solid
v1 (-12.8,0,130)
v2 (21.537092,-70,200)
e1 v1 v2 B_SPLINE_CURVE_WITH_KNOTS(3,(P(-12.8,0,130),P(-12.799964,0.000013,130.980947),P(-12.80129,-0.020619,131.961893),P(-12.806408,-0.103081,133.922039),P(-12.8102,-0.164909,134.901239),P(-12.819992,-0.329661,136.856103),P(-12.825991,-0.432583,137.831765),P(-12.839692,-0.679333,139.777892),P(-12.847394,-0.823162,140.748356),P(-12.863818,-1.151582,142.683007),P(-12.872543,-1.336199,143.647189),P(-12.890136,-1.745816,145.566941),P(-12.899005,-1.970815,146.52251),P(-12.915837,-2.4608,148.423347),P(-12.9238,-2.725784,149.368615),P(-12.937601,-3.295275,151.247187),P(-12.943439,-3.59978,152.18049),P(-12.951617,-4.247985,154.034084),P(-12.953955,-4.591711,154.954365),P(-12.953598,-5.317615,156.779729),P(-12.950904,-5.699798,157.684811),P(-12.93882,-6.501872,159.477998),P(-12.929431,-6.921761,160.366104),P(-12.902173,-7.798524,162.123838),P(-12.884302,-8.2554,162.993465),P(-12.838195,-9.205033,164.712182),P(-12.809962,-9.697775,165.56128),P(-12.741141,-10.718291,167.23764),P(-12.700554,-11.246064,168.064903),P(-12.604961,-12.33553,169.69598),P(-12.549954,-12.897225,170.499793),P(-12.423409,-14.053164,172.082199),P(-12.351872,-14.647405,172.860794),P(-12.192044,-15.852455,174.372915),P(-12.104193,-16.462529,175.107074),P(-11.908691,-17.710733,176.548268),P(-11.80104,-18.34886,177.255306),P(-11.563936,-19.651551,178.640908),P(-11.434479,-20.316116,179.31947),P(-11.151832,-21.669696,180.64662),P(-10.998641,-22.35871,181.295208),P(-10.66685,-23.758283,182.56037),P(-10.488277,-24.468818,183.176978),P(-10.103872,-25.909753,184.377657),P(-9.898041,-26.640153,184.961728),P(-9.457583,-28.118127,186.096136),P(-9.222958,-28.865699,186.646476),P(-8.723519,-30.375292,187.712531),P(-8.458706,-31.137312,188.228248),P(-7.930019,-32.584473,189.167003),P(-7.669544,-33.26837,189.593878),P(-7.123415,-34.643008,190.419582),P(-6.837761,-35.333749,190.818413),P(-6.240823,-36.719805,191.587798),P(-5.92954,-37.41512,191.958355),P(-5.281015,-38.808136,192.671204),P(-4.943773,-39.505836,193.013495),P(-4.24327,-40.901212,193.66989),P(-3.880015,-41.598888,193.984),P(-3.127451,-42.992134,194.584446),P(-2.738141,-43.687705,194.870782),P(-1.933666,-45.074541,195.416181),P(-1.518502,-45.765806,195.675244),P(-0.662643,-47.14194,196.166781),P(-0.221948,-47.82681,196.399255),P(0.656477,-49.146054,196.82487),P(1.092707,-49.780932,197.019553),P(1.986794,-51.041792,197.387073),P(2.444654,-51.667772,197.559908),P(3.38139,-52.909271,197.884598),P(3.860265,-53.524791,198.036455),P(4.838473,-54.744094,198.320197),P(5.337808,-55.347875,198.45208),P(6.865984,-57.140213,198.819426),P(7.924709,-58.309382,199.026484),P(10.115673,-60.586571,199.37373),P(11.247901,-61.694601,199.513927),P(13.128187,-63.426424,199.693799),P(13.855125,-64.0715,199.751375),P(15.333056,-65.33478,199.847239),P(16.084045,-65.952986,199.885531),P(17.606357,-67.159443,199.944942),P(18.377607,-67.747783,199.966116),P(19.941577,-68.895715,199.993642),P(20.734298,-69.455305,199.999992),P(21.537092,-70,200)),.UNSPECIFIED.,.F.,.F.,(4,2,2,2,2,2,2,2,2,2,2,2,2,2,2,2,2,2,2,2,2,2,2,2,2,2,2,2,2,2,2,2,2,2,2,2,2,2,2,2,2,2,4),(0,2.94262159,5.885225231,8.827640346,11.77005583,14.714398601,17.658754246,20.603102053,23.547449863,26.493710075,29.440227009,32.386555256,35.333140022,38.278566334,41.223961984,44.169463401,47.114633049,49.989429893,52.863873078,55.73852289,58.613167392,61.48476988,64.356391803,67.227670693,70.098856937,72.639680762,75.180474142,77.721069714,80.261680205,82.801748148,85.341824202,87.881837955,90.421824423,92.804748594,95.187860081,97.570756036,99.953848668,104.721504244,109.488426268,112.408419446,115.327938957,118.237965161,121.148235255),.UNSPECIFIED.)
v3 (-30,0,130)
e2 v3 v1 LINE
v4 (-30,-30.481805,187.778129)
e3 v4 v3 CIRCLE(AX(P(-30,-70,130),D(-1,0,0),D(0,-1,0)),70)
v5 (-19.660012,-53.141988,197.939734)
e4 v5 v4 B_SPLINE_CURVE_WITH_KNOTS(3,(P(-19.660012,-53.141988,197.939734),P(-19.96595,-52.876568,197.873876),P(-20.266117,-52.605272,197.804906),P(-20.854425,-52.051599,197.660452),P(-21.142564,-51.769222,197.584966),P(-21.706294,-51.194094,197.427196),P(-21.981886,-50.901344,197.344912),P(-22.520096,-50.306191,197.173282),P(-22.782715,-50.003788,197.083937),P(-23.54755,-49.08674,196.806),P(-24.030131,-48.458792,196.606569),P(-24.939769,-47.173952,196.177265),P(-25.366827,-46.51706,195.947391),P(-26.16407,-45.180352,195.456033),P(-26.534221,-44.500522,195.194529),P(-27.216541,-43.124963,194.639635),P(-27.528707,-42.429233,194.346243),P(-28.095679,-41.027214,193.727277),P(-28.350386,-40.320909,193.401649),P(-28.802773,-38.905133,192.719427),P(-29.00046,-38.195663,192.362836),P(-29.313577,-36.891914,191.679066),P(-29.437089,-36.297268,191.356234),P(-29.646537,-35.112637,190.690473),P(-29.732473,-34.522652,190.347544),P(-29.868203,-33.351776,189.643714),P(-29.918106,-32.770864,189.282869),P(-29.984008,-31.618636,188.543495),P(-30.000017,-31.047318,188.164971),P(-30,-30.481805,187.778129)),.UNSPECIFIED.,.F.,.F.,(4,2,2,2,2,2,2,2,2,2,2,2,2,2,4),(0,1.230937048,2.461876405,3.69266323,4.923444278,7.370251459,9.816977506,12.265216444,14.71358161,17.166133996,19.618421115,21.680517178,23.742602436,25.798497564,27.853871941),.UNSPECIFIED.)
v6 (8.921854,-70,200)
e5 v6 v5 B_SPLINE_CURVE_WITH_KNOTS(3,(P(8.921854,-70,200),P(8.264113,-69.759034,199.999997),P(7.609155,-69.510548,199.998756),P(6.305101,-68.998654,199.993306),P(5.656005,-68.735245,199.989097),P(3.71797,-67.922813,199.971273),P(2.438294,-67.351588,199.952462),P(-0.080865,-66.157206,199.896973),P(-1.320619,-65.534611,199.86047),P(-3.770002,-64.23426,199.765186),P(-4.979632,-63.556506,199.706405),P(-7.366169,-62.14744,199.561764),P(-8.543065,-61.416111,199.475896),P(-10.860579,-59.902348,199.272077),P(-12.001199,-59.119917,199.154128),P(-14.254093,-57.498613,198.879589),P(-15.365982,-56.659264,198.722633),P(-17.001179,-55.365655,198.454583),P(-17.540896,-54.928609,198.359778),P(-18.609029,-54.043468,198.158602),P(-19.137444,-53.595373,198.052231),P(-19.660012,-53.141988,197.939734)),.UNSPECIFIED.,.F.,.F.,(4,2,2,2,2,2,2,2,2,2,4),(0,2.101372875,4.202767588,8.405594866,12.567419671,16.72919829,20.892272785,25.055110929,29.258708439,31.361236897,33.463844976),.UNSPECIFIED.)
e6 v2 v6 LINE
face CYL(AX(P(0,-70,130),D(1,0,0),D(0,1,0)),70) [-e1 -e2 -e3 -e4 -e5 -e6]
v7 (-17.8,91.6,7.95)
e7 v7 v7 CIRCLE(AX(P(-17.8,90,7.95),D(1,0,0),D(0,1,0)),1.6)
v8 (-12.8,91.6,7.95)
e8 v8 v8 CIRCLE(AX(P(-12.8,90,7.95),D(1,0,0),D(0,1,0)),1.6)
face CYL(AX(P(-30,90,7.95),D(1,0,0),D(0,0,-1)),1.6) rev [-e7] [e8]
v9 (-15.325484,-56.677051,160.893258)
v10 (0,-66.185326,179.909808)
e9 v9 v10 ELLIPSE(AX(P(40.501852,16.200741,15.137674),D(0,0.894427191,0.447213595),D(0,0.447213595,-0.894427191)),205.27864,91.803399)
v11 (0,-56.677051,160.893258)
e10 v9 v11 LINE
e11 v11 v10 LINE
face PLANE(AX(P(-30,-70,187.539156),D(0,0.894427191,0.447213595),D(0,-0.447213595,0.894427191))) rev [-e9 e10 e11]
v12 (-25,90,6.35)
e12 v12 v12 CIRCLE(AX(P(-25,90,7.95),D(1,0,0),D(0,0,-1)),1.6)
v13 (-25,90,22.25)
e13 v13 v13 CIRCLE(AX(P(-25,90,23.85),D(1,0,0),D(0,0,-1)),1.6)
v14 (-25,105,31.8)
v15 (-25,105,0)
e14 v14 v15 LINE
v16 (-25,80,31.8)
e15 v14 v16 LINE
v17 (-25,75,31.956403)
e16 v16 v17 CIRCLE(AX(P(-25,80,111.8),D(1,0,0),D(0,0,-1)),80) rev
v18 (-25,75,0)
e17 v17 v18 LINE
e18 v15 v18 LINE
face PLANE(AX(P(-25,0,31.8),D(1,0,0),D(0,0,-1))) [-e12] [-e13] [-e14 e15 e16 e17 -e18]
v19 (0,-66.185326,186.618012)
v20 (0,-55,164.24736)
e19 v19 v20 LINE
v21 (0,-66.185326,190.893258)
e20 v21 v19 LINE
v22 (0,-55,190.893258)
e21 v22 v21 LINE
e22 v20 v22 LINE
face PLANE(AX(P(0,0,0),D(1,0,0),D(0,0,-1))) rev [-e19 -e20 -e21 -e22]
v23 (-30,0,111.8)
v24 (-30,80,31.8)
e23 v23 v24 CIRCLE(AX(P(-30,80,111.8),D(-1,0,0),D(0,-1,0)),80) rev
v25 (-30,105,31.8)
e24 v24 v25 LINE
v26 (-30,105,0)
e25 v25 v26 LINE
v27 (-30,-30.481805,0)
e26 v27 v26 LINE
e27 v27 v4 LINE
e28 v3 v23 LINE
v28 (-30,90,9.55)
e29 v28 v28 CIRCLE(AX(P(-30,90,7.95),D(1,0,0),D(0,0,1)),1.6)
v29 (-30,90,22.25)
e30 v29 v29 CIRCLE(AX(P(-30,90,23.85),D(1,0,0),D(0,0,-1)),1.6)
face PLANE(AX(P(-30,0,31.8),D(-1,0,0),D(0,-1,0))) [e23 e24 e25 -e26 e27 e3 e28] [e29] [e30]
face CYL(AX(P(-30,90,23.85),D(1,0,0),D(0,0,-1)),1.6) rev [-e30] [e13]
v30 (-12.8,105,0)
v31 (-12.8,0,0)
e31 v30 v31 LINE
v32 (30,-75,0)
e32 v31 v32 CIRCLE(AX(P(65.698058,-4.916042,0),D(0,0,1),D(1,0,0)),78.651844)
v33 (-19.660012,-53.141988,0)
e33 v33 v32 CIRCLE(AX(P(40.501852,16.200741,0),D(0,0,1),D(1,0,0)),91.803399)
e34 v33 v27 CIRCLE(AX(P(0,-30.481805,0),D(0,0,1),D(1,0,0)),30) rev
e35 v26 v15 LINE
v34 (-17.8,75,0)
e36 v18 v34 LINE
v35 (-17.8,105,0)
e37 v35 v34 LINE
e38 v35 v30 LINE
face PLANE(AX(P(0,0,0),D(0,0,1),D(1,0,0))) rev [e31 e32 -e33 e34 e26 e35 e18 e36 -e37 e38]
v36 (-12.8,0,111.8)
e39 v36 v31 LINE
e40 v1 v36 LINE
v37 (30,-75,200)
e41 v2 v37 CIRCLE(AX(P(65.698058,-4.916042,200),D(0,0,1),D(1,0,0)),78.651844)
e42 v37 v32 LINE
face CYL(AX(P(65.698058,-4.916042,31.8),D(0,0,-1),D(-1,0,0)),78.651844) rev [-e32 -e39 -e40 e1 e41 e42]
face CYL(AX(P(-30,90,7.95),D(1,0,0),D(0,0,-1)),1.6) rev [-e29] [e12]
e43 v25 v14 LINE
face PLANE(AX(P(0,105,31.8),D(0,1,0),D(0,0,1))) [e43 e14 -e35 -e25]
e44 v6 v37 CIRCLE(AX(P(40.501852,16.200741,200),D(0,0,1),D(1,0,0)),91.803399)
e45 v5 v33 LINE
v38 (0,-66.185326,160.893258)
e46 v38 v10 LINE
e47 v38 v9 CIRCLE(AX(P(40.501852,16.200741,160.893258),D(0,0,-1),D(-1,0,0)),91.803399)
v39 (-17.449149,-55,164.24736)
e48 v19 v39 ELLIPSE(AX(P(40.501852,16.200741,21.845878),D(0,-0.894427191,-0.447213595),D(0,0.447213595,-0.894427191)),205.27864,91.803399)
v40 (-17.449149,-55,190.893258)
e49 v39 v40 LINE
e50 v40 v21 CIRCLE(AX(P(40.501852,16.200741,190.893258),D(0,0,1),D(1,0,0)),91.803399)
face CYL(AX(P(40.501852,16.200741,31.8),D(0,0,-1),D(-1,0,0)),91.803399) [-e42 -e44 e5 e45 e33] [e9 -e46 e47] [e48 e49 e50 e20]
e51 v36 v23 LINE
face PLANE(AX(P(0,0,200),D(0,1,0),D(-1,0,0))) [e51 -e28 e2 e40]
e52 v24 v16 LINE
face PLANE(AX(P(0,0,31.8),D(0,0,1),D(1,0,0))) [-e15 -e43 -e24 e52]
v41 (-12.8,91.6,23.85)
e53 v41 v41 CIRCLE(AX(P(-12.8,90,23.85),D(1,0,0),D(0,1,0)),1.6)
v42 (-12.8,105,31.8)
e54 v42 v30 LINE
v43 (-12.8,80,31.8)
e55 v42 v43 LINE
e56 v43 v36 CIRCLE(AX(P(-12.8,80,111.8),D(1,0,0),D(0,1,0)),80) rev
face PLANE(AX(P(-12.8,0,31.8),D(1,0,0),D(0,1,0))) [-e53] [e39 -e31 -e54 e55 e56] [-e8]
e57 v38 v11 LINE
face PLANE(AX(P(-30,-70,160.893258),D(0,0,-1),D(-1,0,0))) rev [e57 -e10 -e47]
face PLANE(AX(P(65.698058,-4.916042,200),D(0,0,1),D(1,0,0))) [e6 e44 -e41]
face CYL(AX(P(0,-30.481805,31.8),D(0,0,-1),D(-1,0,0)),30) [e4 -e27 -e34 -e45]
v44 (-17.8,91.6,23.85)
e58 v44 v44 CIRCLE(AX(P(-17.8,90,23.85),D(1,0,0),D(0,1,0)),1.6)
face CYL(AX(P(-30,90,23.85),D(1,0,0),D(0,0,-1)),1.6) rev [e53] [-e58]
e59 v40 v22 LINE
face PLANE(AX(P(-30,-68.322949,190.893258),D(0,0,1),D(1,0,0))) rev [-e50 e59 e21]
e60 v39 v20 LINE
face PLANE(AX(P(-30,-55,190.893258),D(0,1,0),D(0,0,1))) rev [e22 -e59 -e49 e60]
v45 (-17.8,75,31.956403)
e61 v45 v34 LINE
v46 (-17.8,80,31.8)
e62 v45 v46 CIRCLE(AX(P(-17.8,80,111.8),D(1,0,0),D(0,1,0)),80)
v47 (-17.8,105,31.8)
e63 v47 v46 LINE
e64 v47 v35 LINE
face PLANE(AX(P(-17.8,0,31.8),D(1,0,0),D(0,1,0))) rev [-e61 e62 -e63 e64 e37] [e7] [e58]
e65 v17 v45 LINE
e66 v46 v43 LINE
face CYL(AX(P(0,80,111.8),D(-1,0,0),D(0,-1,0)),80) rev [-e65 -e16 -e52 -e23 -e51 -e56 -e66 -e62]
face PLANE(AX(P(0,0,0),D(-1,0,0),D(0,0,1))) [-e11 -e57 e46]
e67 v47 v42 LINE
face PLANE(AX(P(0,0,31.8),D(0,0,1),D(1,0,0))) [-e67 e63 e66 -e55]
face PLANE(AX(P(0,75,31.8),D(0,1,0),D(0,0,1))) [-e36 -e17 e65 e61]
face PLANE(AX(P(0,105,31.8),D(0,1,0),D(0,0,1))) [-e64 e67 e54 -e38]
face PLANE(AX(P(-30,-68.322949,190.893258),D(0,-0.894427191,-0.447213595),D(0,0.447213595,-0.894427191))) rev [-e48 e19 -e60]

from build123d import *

# Parameters (mm, degrees)
RESSALTO_EXTRUS_O1_DEPTH = 31.8
RESSALTO_EXTRUS_O2_START = 31.8
RESSALTO_EXTRUS_O2_DEPTH = 168.2
FILETE1_R                = 80
FILETE2_R                = 30
FILETE3_R                = 70
ESBO_O2_R                = 1.6
CORTE_EXTRUS_O2_DEPTH    = 228.870577403


with BuildPart() as part:
    # Esboço1 → Ressalto-extrusão1 (new body)
    with BuildSketch(Plane.XY):
        Polygon((-17.8, 75), (-25, 75), (-25, 105), (-30, 105), (-30, 75), (-30, 0), (-12.8, 0), (-12.8, 75), (-12.8, 105), (-17.8, 105), align=None)
        with BuildLine():
            Line((-12.8, 0), (-30, 0))
            Line((-30, 0), (-30, -42.598518169))
            ThreePointArc((-30, -42.598518169), (-3.119977625, -64.576731192), (30, -75))
            ThreePointArc((30, -75), (-2.613275136, -43.899042345), (-12.8, 0))
        make_face()
    extrude(amount=RESSALTO_EXTRUS_O1_DEPTH)

    # Esboço1<4> → Ressalto-extrusão2 (add)
    with BuildSketch(Plane.XY.offset(RESSALTO_EXTRUS_O2_START)):
        with BuildLine():
            Line((-12.8, 0), (-30, 0))
            Line((-30, 0), (-30, -42.598518169))
            ThreePointArc((-30, -42.598518169), (-3.119977625, -64.576731192), (30, -75))
            ThreePointArc((30, -75), (-2.613275136, -43.899042345), (-12.8, 0))
        make_face()
    extrude(amount=RESSALTO_EXTRUS_O2_DEPTH)

    # Filete1
    # the kernel refuses this fillet: 80 mm, written as the material it adds along each edge
    with BuildSketch(Plane(origin=(-12.8, 0, 31.8), x_dir=(0, 0, 1), z_dir=(-1, 0, 0))) as filete1_piece_1_section:
        with BuildLine():
            CenterArc((FILETE1_R, FILETE1_R), FILETE1_R, 180, 90)
            Line((0, FILETE1_R), (0, 0))
            Line((0, 0), (FILETE1_R, 0))
        make_face()
    filete1_piece_1 = extrude(amount=17.2, mode=Mode.PRIVATE)
    filete1_piece_1 = filete1_piece_1 - Plane(origin=(65.698057665, -4.916041759, 49.992599302), x_dir=(-0.4538743908259289, -0.8910656751061574, 0), z_dir=(0, 0, -1)) * Cylinder(78.65184374, 355, mode=Mode.PRIVATE)
    filete1_piece_1 = split(filete1_piece_1, bisect_by=Plane(origin=(-15.301775564, 75, 49.992599302), z_dir=(0, -1, 0)), keep=Keep.TOP, mode=Mode.PRIVATE)
    filete1_piece_1 = split(filete1_piece_1, bisect_by=Plane(origin=(-17.8, 17.823232591, 49.992599302), z_dir=(1, 0, 0)), keep=Keep.TOP, mode=Mode.PRIVATE)
    add(filete1_piece_1)
    with BuildSketch(Plane(origin=(-12.8, 0, 31.8), x_dir=(0, 0, 1), z_dir=(-1, 0, 0))) as filete1_piece_2_section:
        with BuildLine():
            CenterArc((FILETE1_R, FILETE1_R), FILETE1_R, 180, 90)
            Line((0, FILETE1_R), (0, 0))
            Line((0, 0), (FILETE1_R, 0))
        make_face()
    filete1_piece_2 = extrude(amount=17.2, mode=Mode.PRIVATE)
    filete1_piece_2 = split(filete1_piece_2, bisect_by=Plane(origin=(-15.3, 75, 31.026714825), z_dir=(0, 1, 0)), keep=Keep.TOP, mode=Mode.PRIVATE)
    filete1_piece_2 = split(filete1_piece_2, bisect_by=Plane(origin=(-17.8, 77.46056258, 31.026714825), z_dir=(1, 0, 0)), keep=Keep.TOP, mode=Mode.PRIVATE)
    add(filete1_piece_2)
    with BuildSketch(Plane(origin=(-12.8, 0, 31.8), x_dir=(0, 0, 1), z_dir=(-1, 0, 0))) as filete1_piece_3_section:
        with BuildLine():
            CenterArc((FILETE1_R, FILETE1_R), FILETE1_R, 180, 90)
            Line((0, FILETE1_R), (0, 0))
            Line((0, 0), (FILETE1_R, 0))
        make_face()
    filete1_piece_3 = extrude(amount=17.2, mode=Mode.PRIVATE)
    filete1_piece_3 = split(filete1_piece_3, bisect_by=Plane(origin=(-25, 17.809681015, 50.007682963), z_dir=(1, 0, 0)), keep=Keep.TOP, mode=Mode.PRIVATE)
    filete1_piece_3 = split(filete1_piece_3, bisect_by=Plane(origin=(-21.4, 75, 50.007682963), z_dir=(0, -1, 0)), keep=Keep.TOP, mode=Mode.PRIVATE)
    filete1_piece_3 = split(filete1_piece_3, bisect_by=Plane(origin=(-17.8, 17.809681015, 50.007682963), z_dir=(-1, 0, 0)), keep=Keep.TOP, mode=Mode.PRIVATE)
    add(filete1_piece_3)
    with BuildSketch(Plane(origin=(-12.8, 0, 31.8), x_dir=(0, 0, 1), z_dir=(-1, 0, 0))) as filete1_piece_4_section:
        with BuildLine():
            CenterArc((FILETE1_R, FILETE1_R), FILETE1_R, 180, 90)
            Line((0, FILETE1_R), (0, 0))
            Line((0, 0), (FILETE1_R, 0))
        make_face()
    filete1_piece_4 = extrude(amount=17.2, mode=Mode.PRIVATE)
    filete1_piece_4 = split(filete1_piece_4, bisect_by=Plane(origin=(-25, 17.809681015, 50.007682963), z_dir=(-1, 0, 0)), keep=Keep.TOP, mode=Mode.PRIVATE)
    filete1_piece_4 = split(filete1_piece_4, bisect_by=Plane(origin=(-27.5, 75, 50.007682963), z_dir=(0, -1, 0)), keep=Keep.TOP, mode=Mode.PRIVATE)
    add(filete1_piece_4)
    with BuildSketch(Plane(origin=(-12.8, 0, 31.8), x_dir=(0, 0, 1), z_dir=(-1, 0, 0))) as filete1_piece_5_section:
        with BuildLine():
            CenterArc((FILETE1_R, FILETE1_R), FILETE1_R, 180, 90)
            Line((0, FILETE1_R), (0, 0))
            Line((0, 0), (FILETE1_R, 0))
        make_face()
    filete1_piece_5 = extrude(amount=17.2, mode=Mode.PRIVATE)
    filete1_piece_5 = split(filete1_piece_5, bisect_by=Plane(origin=(-25, 77.46056258, 31.026714825), z_dir=(-1, 0, 0)), keep=Keep.TOP, mode=Mode.PRIVATE)
    filete1_piece_5 = split(filete1_piece_5, bisect_by=Plane(origin=(-27.5, 75, 31.026714825), z_dir=(0, 1, 0)), keep=Keep.TOP, mode=Mode.PRIVATE)
    add(filete1_piece_5)

    # Filete2
    filete2_edges = [part.edges().sort_by_distance(p)[0] for p in [
        (-30, -42.598518169, 100),
    ]]
    fillet(filete2_edges, radius=FILETE2_R)

    # Filete3
    # the kernel refuses this fillet: 70 mm, written as the material it takes off along each edge
    with BuildSketch(Plane(origin=(162.2, 0, 200), x_dir=(0, -1, 0), z_dir=(-1, 0, 0))) as filete3_piece_1:
        with BuildLine():
            CenterArc((FILETE3_R, -FILETE3_R), FILETE3_R, 90, 90)
            Line((0, -FILETE3_R), (0, 0))
            Line((0, 0), (FILETE3_R, 0))
        make_face()
    extrude(amount=367.2, mode=Mode.SUBTRACT)

    # Esboço2 → Corte-extrusão2 (cut, through all)
    with BuildSketch(Plane(origin=(0, 0, 0), x_dir=(0, 0, -1), z_dir=(1, 0, 0))):
        with Locations((-23.85, 90)):
            Circle(ESBO_O2_R)
        with Locations((-7.95, 90)):
            Circle(ESBO_O2_R)
        Polygon((-187.539156299, -70), (-160.893258266, -56.677050983), (-160.893258266, -70), align=None)
        Polygon((-190.893258266, -68.322949017), (-164.247360232, -55), (-190.893258266, -55), align=None)
    extrude(amount=-CORTE_EXTRUS_O2_DEPTH, mode=Mode.SUBTRACT)


solid = part.part
